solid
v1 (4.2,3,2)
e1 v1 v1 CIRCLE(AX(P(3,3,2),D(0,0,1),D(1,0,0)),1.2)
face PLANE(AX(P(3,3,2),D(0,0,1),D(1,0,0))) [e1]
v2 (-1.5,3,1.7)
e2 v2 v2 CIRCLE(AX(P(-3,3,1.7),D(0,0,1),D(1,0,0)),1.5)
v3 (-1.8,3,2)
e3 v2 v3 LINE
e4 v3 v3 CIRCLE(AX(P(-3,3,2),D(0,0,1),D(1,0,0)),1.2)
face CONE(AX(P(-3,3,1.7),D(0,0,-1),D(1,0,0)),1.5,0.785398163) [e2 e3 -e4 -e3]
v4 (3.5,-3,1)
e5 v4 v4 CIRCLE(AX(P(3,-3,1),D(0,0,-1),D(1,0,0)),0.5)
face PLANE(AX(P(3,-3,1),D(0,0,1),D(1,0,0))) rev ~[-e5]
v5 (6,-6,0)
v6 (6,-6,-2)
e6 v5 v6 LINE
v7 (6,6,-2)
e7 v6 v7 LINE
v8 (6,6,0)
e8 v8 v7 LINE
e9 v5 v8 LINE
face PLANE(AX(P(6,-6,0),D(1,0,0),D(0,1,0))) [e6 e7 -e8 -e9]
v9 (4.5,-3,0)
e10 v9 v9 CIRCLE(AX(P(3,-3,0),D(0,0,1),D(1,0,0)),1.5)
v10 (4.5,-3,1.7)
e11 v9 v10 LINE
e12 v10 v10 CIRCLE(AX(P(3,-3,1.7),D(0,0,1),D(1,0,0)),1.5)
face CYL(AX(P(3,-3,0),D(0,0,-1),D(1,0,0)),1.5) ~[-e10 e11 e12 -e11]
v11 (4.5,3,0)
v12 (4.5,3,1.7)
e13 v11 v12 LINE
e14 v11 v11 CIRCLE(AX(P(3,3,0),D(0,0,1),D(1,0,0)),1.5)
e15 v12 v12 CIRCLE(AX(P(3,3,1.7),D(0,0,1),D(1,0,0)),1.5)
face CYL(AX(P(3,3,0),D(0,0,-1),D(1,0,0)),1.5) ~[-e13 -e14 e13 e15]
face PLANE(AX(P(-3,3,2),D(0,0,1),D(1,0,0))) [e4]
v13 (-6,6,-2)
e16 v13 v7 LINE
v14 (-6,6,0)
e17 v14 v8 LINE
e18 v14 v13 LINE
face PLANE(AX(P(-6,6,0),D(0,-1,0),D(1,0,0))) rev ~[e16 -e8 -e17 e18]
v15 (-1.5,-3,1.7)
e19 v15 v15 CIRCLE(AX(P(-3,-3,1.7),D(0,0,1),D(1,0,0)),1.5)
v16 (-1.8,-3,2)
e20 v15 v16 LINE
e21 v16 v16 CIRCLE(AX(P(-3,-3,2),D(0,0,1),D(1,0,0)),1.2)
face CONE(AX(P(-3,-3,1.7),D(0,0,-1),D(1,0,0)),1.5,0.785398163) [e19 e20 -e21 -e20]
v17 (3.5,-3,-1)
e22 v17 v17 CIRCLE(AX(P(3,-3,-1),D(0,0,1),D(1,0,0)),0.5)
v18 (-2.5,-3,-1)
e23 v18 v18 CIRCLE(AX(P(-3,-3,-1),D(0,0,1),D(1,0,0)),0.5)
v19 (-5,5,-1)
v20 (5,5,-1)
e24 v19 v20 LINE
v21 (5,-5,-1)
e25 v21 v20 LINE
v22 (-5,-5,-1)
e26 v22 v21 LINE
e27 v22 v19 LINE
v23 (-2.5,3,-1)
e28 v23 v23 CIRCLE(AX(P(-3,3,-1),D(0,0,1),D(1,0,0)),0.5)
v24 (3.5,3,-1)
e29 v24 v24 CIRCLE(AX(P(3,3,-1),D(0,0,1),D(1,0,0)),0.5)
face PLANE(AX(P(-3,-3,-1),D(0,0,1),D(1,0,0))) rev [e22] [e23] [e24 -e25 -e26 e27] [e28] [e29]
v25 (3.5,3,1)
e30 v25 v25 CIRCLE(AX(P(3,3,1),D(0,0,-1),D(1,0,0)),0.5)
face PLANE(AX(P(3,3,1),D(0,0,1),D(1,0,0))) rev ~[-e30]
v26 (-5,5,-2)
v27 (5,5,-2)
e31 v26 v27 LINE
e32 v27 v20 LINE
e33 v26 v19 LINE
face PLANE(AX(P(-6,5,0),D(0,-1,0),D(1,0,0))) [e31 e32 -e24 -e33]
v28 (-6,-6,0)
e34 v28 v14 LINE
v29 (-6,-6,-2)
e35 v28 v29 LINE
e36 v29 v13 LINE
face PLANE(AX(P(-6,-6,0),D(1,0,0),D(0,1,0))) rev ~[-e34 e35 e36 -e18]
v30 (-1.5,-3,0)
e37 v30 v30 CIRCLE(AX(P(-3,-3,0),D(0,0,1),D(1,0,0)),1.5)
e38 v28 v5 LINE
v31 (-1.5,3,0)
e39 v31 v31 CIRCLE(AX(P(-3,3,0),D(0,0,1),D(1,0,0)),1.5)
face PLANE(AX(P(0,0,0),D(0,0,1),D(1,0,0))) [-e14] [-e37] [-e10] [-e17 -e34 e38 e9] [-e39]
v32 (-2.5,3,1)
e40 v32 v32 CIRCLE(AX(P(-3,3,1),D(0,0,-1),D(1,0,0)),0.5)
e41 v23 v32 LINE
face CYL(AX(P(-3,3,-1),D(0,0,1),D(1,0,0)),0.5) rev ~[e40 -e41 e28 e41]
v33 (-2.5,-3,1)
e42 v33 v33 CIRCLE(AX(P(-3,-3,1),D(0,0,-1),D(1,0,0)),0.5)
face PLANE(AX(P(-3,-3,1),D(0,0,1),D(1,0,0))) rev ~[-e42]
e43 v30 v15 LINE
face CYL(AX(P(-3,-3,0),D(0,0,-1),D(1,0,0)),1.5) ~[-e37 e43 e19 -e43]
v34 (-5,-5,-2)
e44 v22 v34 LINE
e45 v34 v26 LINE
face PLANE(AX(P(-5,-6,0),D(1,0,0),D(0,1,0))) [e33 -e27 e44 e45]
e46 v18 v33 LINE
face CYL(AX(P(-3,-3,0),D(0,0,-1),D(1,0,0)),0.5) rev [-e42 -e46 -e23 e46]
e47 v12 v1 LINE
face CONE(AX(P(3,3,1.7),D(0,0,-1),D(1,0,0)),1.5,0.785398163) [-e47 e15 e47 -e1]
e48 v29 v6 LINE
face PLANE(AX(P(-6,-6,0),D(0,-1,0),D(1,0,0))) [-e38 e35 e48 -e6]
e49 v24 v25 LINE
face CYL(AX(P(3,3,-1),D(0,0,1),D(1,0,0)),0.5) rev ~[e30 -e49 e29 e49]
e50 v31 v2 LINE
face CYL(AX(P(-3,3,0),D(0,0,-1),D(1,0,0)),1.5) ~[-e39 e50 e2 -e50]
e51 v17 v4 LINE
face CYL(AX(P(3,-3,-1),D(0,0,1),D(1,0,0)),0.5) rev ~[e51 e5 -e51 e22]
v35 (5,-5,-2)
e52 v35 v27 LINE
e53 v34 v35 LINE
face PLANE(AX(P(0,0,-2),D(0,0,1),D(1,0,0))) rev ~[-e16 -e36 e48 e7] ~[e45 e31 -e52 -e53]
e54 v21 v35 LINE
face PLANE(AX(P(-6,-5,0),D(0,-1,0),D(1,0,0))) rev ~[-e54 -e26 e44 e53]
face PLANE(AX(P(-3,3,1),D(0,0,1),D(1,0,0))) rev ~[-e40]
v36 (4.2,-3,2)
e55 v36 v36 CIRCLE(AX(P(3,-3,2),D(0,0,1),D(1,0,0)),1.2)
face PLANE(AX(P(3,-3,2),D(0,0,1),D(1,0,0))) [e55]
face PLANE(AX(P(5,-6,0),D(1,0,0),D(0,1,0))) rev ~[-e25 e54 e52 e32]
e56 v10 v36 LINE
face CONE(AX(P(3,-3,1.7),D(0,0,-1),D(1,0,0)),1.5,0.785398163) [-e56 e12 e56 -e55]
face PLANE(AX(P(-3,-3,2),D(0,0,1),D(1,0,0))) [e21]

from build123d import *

# Parameters (mm, degrees)
F3_W     = 12
F3_H     = 12
F0_DEPTH = 2
F1_R     = 1.5
F4_DEPTH = 2
F5_SIZE  = 0.3
F2_T     = 1


# Not quite as in the source:
# - a shell that OpenCascade refuses in one call is made with other operations: the cavity is built on its own and cut out


with BuildPart() as f0:
    # F3 (on Top) → F0 (new body)
    with BuildSketch(Plane.XY):
        Rectangle(F3_W, F3_H)
    extrude(amount=-F0_DEPTH)

    # F1 (on Top) → F4 (join)
    with BuildSketch(Plane.XY):
        with Locations((3, 3)):
            Circle(F1_R)
        with Locations((-3, 3)):
            Circle(F1_R)
        with Locations((3, -3)):
            Circle(F1_R)
        with Locations((-3, -3)):
            Circle(F1_R)
    extrude(amount=F4_DEPTH)

    # F5
    f5_edges = [f0.edges().sort_by_distance(p)[0] for p in [
        (-4.5, 3, 2),
        (1.5, 3, 2),
        (-4.5, -3, 2),
        (1.5, -3, 2),
    ]]
    chamfer(f5_edges, length=F5_SIZE)

    # F2: shell of thickness 1, made by hand


with BuildPart() as f2_core1:
    # F2_t2: copy of F0
    add(f0.part)

    # the walls: a layer under each face that stays
    f2_faces = [f2_core1.faces().sort_by_distance(p)[0] for p in [
        (-4.5, -3, 0.85),
        (-4.35, -3, 1.85),
        (0, 0, 0),
        (-3, -3, 2),
        (0, 6, -1),
        (6, 0, -1),
        (-6, 0, -1),
        (0, -6, -1),
        (1.5, -3, 0.85),
        (-4.5, 3, 0.85),
        (1.5, 3, 0.85),
        (1.65, -3, 1.85),
        (-4.35, 3, 1.85),
        (1.65, 3, 1.85),
        (3, -3, 2),
        (-3, 3, 2),
        (3, 3, 2),
    ]]
    thicken(f2_faces, amount=-F2_T, mode=Mode.SUBTRACT)

    # F2_s3 → F2_t4 (revolve, cut)
    with BuildSketch(Plane.XZ.offset(3)):
        Polygon((-1.49, 0.01), (-2.5, 0), (-2.5, -1), (-1.5, -1), align=None)
    revolve(axis=Axis((-3, -3, 0), (0, 0, 1)), mode=Mode.SUBTRACT)

    # F2_s5 → F2_t6 (revolve, cut)
    with BuildSketch(Plane.XZ.offset(3)):
        Polygon((4.51, 0.01), (4.5, -1), (3.5, -1), (3.5, 0), align=None)
    revolve(axis=Axis((3, -3, 0), (0, 0, 1)), mode=Mode.SUBTRACT)

    # F2_s7 → F2_t8 (revolve, cut)
    with BuildSketch(Plane.XZ.offset(-3)):
        Polygon((-1.49, 0.01), (-1.5, -1), (-2.5, -1), (-2.5, 0), align=None)
    revolve(axis=Axis((-3, 3, 0), (0, 0, 1)), mode=Mode.SUBTRACT)

    # F2_s9 → F2_t10 (revolve, cut)
    with BuildSketch(Plane.XZ.offset(-3)):
        Polygon((4.51, 0.01), (4.5, -1), (3.5, -1), (3.5, 0), align=None)
    revolve(axis=Axis((3, 3, 0), (0, 0, 1)), mode=Mode.SUBTRACT)


with BuildPart() as f0_1:
    add(f0.part)

    # what is left inside the walls is the cavity
    f2_cavity = [f2_core1.part.solids().sort_by_distance(p)[0] for p in [
        (0, -1.666667, -1.99),
    ]]
    add(f2_cavity, mode=Mode.SUBTRACT)


solid = f0_1.part
